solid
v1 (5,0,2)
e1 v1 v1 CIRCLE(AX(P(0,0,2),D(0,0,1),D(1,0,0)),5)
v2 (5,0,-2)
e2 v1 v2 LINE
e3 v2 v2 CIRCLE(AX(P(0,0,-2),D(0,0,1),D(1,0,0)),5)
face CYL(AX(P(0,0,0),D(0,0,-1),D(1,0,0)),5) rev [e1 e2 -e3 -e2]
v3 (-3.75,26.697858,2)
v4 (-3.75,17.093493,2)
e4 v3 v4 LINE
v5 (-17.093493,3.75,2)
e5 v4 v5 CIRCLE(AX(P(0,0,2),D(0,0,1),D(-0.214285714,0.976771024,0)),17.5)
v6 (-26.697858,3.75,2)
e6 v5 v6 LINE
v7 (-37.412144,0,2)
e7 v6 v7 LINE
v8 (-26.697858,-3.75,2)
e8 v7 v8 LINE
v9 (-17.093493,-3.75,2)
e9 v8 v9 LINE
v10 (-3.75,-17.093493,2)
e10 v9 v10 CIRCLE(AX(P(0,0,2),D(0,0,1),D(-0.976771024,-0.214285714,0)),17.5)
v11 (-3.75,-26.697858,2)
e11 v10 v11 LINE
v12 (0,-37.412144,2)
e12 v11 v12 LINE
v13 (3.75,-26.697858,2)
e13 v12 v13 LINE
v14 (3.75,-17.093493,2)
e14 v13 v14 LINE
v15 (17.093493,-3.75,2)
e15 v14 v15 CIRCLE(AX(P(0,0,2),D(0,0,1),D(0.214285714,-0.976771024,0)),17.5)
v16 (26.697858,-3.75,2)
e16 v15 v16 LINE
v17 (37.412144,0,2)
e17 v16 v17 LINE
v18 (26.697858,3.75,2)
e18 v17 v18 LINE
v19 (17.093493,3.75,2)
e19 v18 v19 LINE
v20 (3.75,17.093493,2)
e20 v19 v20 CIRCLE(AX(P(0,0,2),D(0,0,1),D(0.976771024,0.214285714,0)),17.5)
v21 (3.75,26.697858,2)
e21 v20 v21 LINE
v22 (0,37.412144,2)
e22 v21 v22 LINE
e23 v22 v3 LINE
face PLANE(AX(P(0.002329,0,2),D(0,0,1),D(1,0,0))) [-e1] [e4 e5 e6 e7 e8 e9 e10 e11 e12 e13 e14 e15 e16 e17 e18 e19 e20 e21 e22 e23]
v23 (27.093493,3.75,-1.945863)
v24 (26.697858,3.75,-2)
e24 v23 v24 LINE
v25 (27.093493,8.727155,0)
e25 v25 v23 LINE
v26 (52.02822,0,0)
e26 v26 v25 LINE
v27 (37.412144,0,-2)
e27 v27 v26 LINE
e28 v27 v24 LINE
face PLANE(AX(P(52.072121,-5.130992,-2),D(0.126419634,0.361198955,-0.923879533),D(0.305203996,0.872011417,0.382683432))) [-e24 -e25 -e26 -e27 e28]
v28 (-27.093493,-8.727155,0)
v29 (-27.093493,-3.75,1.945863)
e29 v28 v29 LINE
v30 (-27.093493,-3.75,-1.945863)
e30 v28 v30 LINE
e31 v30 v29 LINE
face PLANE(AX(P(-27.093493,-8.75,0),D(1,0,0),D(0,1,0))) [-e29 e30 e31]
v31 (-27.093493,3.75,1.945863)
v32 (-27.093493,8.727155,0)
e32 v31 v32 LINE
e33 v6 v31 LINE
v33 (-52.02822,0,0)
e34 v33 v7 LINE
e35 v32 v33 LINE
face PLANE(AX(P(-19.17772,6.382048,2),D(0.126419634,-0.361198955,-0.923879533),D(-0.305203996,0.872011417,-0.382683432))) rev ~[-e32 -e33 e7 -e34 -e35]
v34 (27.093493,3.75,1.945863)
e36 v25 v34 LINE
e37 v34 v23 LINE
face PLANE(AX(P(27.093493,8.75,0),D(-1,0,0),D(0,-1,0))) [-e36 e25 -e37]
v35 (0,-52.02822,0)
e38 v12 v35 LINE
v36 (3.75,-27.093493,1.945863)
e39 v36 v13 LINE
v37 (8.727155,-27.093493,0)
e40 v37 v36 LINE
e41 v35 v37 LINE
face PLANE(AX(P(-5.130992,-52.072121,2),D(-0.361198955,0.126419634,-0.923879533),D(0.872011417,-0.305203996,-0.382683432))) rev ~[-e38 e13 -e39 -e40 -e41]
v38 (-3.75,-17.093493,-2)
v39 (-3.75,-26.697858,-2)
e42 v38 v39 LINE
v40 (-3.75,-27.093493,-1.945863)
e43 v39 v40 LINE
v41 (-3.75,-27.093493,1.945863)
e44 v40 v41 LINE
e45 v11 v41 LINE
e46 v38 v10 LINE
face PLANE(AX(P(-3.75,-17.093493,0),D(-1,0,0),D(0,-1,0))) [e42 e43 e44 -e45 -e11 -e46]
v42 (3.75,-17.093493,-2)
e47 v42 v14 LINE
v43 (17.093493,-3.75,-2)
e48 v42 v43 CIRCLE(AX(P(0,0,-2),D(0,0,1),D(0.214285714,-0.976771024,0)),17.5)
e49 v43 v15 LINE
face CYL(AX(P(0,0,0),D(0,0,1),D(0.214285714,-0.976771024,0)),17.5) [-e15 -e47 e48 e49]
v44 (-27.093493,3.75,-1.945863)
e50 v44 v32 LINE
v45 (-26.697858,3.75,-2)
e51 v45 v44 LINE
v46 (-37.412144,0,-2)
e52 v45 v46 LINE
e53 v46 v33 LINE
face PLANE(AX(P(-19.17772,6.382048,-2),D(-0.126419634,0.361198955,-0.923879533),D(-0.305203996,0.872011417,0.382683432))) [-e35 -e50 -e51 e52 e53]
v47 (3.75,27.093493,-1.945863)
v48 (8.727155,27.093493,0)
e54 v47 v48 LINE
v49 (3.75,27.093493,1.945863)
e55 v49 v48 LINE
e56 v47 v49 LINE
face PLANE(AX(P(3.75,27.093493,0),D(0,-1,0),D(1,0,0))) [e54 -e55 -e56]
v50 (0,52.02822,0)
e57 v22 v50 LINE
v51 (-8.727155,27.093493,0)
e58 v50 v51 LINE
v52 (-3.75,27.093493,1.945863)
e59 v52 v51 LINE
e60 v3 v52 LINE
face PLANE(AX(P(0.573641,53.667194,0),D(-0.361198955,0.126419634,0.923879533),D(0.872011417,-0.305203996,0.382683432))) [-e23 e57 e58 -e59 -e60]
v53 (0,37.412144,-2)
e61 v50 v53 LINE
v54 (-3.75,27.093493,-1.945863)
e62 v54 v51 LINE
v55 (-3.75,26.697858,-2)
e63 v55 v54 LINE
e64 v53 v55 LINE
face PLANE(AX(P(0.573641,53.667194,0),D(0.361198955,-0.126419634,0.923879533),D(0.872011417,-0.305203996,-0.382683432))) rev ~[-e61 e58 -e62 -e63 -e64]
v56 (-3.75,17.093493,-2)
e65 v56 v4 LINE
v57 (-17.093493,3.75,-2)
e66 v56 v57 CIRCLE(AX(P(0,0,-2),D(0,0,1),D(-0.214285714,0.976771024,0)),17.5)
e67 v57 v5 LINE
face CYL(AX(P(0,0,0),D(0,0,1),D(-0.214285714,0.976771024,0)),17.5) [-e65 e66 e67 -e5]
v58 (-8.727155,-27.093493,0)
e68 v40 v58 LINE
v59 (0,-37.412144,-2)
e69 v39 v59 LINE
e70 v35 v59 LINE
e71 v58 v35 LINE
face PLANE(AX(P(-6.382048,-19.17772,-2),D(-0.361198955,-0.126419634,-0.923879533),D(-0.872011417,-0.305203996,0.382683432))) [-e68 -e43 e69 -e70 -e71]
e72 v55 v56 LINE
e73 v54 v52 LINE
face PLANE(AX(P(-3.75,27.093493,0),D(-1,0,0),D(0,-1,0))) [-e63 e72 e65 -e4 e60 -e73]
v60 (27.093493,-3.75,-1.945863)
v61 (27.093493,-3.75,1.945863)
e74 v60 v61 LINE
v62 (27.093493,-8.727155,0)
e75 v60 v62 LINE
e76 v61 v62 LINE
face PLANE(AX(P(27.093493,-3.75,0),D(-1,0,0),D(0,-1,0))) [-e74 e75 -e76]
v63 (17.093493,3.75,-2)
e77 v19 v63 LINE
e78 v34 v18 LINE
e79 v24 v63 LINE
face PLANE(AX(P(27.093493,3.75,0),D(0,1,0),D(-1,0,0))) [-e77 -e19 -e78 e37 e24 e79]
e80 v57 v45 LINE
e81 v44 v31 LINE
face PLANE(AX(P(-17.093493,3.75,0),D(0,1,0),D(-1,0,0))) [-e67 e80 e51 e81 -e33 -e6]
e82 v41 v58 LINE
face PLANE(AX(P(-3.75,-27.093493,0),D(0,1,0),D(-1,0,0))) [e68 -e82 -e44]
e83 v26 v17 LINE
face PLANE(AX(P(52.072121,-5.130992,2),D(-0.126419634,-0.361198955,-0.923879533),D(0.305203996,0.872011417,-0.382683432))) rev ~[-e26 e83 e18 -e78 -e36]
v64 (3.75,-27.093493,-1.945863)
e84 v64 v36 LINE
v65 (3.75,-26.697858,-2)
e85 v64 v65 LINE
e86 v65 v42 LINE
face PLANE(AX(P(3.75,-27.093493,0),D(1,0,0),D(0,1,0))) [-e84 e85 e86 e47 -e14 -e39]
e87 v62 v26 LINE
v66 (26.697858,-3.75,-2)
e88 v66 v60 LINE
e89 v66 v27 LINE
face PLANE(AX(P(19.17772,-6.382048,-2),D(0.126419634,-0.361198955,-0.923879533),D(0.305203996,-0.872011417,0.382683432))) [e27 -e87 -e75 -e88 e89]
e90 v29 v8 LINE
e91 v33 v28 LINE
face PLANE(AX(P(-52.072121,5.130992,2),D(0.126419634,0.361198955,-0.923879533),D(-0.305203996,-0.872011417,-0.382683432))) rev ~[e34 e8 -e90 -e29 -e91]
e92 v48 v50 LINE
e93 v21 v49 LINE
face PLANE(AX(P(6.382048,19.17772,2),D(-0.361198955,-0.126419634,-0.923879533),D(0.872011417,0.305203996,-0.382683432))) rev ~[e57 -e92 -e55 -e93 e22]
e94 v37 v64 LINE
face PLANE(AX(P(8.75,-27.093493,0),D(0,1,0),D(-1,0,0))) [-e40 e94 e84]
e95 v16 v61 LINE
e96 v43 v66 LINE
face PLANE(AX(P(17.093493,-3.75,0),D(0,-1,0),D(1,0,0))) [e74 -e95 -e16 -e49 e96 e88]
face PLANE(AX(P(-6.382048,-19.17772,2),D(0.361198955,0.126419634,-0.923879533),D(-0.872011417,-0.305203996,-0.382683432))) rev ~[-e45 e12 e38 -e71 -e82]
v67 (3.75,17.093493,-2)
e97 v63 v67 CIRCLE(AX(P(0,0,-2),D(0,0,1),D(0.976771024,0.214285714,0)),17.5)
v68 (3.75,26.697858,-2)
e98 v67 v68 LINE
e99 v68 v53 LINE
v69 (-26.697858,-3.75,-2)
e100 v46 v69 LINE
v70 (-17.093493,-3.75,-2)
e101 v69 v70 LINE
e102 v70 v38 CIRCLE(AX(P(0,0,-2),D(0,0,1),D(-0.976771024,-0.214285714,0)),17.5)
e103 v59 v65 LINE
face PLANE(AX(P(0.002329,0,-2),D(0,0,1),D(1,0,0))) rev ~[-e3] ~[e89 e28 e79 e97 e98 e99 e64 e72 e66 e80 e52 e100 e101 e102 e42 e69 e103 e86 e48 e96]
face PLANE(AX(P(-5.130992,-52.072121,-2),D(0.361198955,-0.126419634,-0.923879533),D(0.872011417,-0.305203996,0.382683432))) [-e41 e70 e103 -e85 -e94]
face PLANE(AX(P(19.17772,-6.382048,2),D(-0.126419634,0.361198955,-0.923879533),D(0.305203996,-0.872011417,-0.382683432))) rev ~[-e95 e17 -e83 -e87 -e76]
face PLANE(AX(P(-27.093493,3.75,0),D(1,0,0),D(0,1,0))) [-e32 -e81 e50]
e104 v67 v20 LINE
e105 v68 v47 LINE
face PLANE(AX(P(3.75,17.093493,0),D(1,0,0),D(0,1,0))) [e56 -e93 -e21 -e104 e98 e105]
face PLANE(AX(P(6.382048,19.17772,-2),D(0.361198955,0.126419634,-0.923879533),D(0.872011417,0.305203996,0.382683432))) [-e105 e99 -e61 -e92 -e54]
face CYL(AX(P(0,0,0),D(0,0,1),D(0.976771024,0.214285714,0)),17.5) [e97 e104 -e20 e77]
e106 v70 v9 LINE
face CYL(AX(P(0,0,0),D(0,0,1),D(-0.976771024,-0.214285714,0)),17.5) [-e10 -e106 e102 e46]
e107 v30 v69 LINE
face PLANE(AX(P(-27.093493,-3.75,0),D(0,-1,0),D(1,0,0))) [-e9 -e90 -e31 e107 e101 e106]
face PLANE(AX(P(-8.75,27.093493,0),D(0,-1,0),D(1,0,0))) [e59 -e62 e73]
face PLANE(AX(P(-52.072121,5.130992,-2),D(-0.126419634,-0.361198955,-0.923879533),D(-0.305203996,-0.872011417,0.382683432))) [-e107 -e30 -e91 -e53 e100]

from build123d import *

# Parameters (mm, degrees)
F0_R         = 5
F1_DEPTH     = 2
F2_SIZE      = 1.99999
F3_T1_DEPTH  = 34.8509927222
F3_T3_DEPTH  = 34.8509927222
F3_T5_DEPTH  = 34.8509927222
F3_T7_DEPTH  = 34.8509927222
F3_T9_DEPTH  = 34.8509927222
F3_T11_DEPTH = 34.8509927222
F3_T13_DEPTH = 34.8509927222
F3_T15_DEPTH = 34.8509927222


# Not quite as in the source:
# - a fillet or chamfer that OpenCascade refuses, or shapes differently, is made with other operations: its cross-section is extruded or revolved along the edge and cut away or added
# - a fillet or chamfer is up to 0.001 mm smaller than in the source, because OpenCascade refuses the exact size


with BuildPart() as f1:
    # F0 (on Top) → F1 (new body, symmetric)
    with BuildSketch(Plane.XY):
        with BuildLine():
            ThreePointArc((17.093492914, -3.75), (17.3980764166, -1.8859843591), (17.5, 0))
            ThreePointArc((17.5, 0), (17.3980764166, 1.8859843591), (17.093492914, 3.75))
            ThreePointArc((17.093492914, 3.75), (12.3743686708, 12.3743686708), (3.75, 17.093492914))
            ThreePointArc((3.75, 17.093492914), (0, 17.5), (-3.75, 17.093492914))
            ThreePointArc((-3.75, 17.093492914), (-12.3743686708, 12.3743686708), (-17.093492914, 3.75))
            ThreePointArc((-17.093492914, 3.75), (-17.5, 0), (-17.093492914, -3.75))
            ThreePointArc((-17.093492914, -3.75), (-12.3743686708, -12.3743686708), (-3.75, -17.093492914))
            ThreePointArc((-3.75, -17.093492914), (0, -17.5), (3.75, -17.093492914))
            ThreePointArc((3.75, -17.093492914), (12.3743686708, -12.3743686708), (17.093492914, -3.75))
        make_face()
        Circle(F0_R, mode=Mode.SUBTRACT)
        with BuildLine():
            ThreePointArc((-17.093492914, -3.75), (-17.5, 0), (-17.093492914, 3.75))
            Line((-17.093492914, 3.75), (-27.093492914, 3.75))
            Line((-27.093492914, 3.75), (-27.093492914, -3.75))
            Line((-27.093492914, -3.75), (-17.093492914, -3.75))
        make_face()
        Polygon((-27.093492914, -3.75), (-27.093492914, 3.75), (-27.093492914, 8.75), (-52.093492914, 0), (-27.093492914, -8.75), align=None)
        with BuildLine():
            ThreePointArc((-3.75, 17.093492914), (0, 17.5), (3.75, 17.093492914))
            Line((3.75, 17.093492914), (3.75, 27.093492914))
            Line((3.75, 27.093492914), (-3.75, 27.093492914))
            Line((-3.75, 27.093492914), (-3.75, 17.093492914))
        make_face()
        Polygon((-3.75, 27.093492914), (3.75, 27.093492914), (8.75, 27.093492914), (0, 52.093492914), (-8.75, 27.093492914), align=None)
        Polygon((27.093492914, 8.75), (27.093492914, 3.75), (27.093492914, -3.75), (27.093492914, -8.75), (52.093492914, 0), align=None)
        Polygon((8.75, -27.093492914), (3.75, -27.093492914), (-3.75, -27.093492914), (-8.75, -27.093492914), (0, -52.093492914), align=None)
        with BuildLine():
            Line((3.75, -27.093492914), (3.75, -17.093492914))
            ThreePointArc((3.75, -17.093492914), (0, -17.5), (-3.75, -17.093492914))
            Line((-3.75, -17.093492914), (-3.75, -27.093492914))
            Line((-3.75, -27.093492914), (3.75, -27.093492914))
        make_face()
        with BuildLine():
            ThreePointArc((17.093492914, 3.75), (17.3980764166, 1.8859843591), (17.5, 0))
            ThreePointArc((17.5, 0), (17.3980764166, -1.8859843591), (17.093492914, -3.75))
            Line((17.093492914, -3.75), (27.093492914, -3.75))
            Line((27.093492914, -3.75), (27.093492914, 3.75))
            Line((27.093492914, 3.75), (17.093492914, 3.75))
        make_face()
    extrude(amount=F1_DEPTH, both=True)

    # F2 (size 2 in the source; OpenCascade refuses exactly that, so slightly less here)
    f2_edges = [f1.edges().sort_by_distance(p)[0] for p in [
        (4.375, -39.593493, 2),
        (-4.375, -39.593493, 2),
        (4.375, -39.593493, -2),
        (-4.375, -39.593493, -2),
        (39.593493, -4.375, -2),
        (39.593493, -4.375, 2),
        (39.593493, 4.375, 2),
        (-39.593493, -4.375, 2),
        (-39.593493, -4.375, -2),
        (-4.375, 39.593493, 2),
        (4.375, 39.593493, 2),
        (39.593493, 4.375, -2),
        (4.375, 39.593493, -2),
        (-39.593493, 4.375, 2),
        (-39.593493, 4.375, -2),
        (-4.375, 39.593493, -2),
    ]]
    chamfer(f2_edges, length=F2_SIZE)

    # F3: chamfer of 2.85 on 16 edges, made by hand

    # F3_s2 → F3_t1 (cut)
    with BuildSketch(Plane(origin=(-16.7962484861, -47.9892813888, 0), x_dir=(0, 0, 1), z_dir=(0.3303504247, 0.9438583564, 0))):
        Polygon((2, 12.3591175097), (-0.0152543264, 17.2243718361), (2, 15.2091175097), align=None)
        Polygon((-2, 12.3591175097), (0.0152543264, 17.2243718361), (-2, 15.2091175097), align=None)
    extrude(amount=F3_T1_DEPTH, mode=Mode.SUBTRACT)

    # F3_s4 → F3_t3 (cut)
    with BuildSketch(Plane(origin=(5.2832082381, -15.0948806803, 0), x_dir=(0, 0, 1), z_dir=(0.3303504247, -0.9438583564, 0))):
        Polygon((2, 12.3591175097), (-0.0152543264, 17.2243718361), (2, 15.2091175097), align=None)
        Polygon((-2, 12.3591175097), (0.0152543264, 17.2243718361), (-2, 15.2091175097), align=None)
    extrude(amount=F3_T3_DEPTH, mode=Mode.SUBTRACT)

    # F3_s6 → F3_t5 (cut)
    with BuildSketch(Plane(origin=(15.0948806803, 5.2832082381, 0), x_dir=(0, 0, 1), z_dir=(0.9438583564, 0.3303504247, 0))):
        Polygon((2, 12.3591175097), (-0.0152543264, 17.2243718361), (2, 15.2091175097), align=None)
        Polygon((-2, 12.3591175097), (0.0152543264, 17.2243718361), (-2, 15.2091175097), align=None)
    extrude(amount=F3_T5_DEPTH, mode=Mode.SUBTRACT)

    # F3_s8 → F3_t7 (cut)
    with BuildSketch(Plane(origin=(47.9892813888, -16.7962484861, 0), x_dir=(0, 0, 1), z_dir=(-0.9438583564, 0.3303504247, 0))):
        Polygon((2, 12.3591175097), (-0.0152543264, 17.2243718361), (2, 15.2091175097), align=None)
        Polygon((-2, 12.3591175097), (0.0152543264, 17.2243718361), (-2, 15.2091175097), align=None)
    extrude(amount=F3_T7_DEPTH, mode=Mode.SUBTRACT)

    # F3_s10 → F3_t9 (cut)
    with BuildSketch(Plane(origin=(-5.2832082381, 15.0948806803, 0), x_dir=(0, 0, 1), z_dir=(-0.3303504247, 0.9438583564, 0))):
        Polygon((2, 12.3591175097), (-0.0152543264, 17.2243718361), (2, 15.2091175097), align=None)
        Polygon((-2, 12.3591175097), (0.0152543264, 17.2243718361), (-2, 15.2091175097), align=None)
    extrude(amount=F3_T9_DEPTH, mode=Mode.SUBTRACT)

    # F3_s12 → F3_t11 (cut)
    with BuildSketch(Plane(origin=(16.7962484861, 47.9892813888, 0), x_dir=(0, 0, 1), z_dir=(-0.3303504247, -0.9438583564, 0))):
        Polygon((-0.0152543264, 17.2243718361), (2, 12.3591175097), (2, 15.2091175097), align=None)
        Polygon((0.0152543264, 17.2243718361), (-2, 12.3591175097), (-2, 15.2091175097), align=None)
    extrude(amount=F3_T11_DEPTH, mode=Mode.SUBTRACT)

    # F3_s14 → F3_t13 (cut)
    with BuildSketch(Plane(origin=(-15.0948806803, -5.2832082381, 0), x_dir=(0, 0, 1), z_dir=(-0.9438583564, -0.3303504247, 0))):
        Polygon((2, 12.3591175097), (-0.0152543264, 17.2243718361), (2, 15.2091175097), align=None)
        Polygon((-2, 12.3591175097), (0.0152543264, 17.2243718361), (-2, 15.2091175097), align=None)
    extrude(amount=F3_T13_DEPTH, mode=Mode.SUBTRACT)

    # F3_s16 → F3_t15 (cut)
    with BuildSketch(Plane(origin=(-47.9892813888, 16.7962484861, 0), x_dir=(0, 0, 1), z_dir=(0.9438583564, -0.3303504247, 0))):
        Polygon((2, 12.3591175097), (-0.0152543264, 17.2243718361), (2, 15.2091175097), align=None)
        Polygon((-2, 12.3591175097), (0.0152543264, 17.2243718361), (-2, 15.2091175097), align=None)
    extrude(amount=F3_T15_DEPTH, mode=Mode.SUBTRACT)


solid = f1.part
